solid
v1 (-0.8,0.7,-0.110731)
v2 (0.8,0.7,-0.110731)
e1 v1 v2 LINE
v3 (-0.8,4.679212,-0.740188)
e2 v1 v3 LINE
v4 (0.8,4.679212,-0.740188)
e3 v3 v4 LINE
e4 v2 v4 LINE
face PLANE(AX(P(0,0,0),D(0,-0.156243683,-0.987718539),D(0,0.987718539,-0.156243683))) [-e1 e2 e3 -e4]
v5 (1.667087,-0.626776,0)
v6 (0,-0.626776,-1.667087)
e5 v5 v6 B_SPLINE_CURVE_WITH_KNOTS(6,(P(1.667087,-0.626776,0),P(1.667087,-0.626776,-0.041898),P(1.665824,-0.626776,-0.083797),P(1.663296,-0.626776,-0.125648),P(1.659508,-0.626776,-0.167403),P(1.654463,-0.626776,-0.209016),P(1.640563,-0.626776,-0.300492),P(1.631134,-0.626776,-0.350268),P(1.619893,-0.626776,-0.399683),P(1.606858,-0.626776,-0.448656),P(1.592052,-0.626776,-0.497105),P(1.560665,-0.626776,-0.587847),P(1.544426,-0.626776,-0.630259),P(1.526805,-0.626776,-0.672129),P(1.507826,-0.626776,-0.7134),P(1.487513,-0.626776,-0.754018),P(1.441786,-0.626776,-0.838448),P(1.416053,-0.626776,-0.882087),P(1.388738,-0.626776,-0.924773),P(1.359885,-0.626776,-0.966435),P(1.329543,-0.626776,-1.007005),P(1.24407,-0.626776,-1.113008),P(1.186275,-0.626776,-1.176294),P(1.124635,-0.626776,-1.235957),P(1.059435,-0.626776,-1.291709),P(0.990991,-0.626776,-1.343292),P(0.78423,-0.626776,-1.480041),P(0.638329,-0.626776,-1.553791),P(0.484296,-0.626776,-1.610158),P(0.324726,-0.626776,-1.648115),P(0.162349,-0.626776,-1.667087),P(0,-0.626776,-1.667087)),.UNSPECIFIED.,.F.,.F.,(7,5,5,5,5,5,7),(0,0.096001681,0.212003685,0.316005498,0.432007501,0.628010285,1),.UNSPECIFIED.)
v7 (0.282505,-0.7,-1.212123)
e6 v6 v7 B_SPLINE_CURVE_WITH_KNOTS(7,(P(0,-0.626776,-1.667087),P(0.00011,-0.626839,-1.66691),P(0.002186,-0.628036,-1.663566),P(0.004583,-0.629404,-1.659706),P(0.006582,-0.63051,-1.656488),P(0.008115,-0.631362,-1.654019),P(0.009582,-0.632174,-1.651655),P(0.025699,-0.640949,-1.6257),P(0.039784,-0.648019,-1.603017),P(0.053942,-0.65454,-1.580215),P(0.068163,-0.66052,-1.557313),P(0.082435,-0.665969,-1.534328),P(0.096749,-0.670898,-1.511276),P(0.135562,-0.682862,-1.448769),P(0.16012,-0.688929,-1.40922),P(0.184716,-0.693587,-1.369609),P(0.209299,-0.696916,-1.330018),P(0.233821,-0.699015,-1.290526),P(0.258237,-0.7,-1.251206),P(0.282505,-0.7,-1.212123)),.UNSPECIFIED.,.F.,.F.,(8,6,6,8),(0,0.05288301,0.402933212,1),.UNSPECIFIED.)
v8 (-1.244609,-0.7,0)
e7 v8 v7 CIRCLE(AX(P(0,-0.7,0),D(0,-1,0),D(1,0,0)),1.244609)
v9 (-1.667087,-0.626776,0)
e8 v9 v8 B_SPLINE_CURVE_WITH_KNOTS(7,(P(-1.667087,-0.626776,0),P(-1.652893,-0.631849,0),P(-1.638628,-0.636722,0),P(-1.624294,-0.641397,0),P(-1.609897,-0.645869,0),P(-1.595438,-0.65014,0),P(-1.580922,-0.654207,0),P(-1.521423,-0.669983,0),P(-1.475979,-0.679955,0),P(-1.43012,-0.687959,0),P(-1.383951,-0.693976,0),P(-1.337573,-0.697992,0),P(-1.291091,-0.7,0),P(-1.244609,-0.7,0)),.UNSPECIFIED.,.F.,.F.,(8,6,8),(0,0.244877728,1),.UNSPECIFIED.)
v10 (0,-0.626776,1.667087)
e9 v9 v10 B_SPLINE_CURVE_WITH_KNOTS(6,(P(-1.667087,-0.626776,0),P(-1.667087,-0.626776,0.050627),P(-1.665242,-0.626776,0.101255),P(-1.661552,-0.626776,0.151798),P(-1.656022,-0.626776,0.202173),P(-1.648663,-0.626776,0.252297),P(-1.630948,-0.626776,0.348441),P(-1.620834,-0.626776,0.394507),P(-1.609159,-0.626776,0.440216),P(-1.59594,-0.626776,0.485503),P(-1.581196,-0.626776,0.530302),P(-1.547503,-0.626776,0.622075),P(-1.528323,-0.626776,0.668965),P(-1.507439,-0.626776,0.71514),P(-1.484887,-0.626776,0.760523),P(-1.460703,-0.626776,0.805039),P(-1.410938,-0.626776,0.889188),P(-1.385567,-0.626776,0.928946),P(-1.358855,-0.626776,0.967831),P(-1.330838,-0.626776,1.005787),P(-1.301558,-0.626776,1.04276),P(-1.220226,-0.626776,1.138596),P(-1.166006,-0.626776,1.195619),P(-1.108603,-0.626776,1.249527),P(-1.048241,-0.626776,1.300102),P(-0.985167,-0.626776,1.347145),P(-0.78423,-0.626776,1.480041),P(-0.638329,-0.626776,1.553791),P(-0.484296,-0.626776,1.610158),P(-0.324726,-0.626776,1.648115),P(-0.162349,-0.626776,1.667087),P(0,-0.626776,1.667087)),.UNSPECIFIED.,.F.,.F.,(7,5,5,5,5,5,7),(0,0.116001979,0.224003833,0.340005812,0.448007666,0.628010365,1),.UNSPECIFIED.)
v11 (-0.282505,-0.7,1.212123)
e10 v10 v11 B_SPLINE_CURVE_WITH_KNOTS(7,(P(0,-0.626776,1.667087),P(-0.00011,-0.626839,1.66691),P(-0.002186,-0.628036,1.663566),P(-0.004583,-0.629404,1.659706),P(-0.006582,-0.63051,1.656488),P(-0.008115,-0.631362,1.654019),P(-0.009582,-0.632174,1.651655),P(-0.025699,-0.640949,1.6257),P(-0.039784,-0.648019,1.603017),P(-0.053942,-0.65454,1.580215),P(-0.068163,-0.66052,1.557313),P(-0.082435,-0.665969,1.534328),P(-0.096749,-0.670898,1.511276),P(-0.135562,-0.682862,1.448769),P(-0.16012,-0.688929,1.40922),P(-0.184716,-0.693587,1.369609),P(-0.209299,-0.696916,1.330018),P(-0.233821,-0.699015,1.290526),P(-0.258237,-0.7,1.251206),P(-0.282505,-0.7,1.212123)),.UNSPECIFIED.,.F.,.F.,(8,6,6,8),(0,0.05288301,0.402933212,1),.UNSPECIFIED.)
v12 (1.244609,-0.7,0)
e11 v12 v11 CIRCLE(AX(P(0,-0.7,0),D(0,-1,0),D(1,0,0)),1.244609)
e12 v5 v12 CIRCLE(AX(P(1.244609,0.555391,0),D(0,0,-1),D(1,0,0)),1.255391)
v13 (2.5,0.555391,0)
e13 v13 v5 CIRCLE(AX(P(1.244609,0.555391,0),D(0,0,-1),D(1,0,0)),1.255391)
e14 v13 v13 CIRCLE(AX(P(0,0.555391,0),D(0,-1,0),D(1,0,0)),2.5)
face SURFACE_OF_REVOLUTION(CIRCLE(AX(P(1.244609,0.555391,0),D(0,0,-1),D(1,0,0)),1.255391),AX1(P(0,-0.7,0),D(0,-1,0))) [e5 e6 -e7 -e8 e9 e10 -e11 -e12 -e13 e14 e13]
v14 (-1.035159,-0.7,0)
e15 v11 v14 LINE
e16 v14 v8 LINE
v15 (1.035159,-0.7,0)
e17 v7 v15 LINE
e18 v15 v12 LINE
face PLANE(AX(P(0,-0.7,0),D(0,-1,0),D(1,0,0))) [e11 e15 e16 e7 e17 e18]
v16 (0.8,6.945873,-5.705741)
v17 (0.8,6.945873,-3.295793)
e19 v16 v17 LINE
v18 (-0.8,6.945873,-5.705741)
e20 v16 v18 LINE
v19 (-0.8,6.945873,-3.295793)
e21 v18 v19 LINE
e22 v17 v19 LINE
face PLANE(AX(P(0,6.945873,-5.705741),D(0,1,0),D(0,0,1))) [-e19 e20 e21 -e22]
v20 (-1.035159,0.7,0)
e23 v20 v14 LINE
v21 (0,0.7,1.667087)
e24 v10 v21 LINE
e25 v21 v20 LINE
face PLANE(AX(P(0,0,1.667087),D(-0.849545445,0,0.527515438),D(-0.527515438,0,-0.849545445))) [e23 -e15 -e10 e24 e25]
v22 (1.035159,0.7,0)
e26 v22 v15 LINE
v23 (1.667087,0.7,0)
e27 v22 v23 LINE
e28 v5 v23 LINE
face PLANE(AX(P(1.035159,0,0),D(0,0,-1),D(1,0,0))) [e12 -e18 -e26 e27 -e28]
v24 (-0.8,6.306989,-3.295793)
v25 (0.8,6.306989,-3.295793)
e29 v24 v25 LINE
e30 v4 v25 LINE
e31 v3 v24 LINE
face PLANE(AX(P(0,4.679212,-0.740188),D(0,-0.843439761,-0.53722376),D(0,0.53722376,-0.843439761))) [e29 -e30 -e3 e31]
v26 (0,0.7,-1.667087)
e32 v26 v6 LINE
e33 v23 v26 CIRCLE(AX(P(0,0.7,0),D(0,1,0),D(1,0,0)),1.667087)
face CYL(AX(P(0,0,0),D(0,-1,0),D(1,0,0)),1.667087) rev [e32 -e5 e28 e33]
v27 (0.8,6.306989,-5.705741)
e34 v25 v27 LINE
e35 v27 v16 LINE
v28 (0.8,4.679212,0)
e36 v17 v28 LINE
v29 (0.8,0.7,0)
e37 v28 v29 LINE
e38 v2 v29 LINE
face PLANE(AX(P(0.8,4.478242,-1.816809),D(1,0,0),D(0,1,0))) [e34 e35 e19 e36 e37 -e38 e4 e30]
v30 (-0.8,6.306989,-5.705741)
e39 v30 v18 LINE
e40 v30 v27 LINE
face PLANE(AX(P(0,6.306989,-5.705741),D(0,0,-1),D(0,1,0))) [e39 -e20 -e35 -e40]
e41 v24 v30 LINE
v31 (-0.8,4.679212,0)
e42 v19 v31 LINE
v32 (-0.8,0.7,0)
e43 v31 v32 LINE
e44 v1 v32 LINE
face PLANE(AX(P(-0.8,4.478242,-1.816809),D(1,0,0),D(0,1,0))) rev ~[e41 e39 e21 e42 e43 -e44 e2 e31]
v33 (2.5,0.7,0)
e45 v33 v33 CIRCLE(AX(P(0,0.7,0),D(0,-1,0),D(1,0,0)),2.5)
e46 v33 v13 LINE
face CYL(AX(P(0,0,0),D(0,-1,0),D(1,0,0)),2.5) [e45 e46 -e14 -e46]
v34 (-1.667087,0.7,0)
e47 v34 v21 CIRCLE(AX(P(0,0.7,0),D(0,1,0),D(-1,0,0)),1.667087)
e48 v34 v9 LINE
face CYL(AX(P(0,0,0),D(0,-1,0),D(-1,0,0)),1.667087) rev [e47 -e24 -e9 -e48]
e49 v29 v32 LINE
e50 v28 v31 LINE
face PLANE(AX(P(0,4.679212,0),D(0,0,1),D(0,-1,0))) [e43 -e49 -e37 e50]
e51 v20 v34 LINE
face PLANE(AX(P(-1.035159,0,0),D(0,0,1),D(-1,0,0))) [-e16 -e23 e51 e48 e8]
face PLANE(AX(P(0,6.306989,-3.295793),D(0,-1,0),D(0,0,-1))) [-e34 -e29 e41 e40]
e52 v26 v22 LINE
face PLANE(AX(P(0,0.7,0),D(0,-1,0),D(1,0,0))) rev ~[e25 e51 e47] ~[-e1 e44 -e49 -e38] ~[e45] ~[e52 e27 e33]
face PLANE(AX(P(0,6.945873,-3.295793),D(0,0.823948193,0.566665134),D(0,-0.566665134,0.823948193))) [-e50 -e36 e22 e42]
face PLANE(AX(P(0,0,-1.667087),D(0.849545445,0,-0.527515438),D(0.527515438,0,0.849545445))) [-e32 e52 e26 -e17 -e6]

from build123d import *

# Parameters (mm, degrees)
F0_R     = 2.5
F2_DEPTH = 0.7
F3_DEPTH = 0.8


# Not quite as in the source:
# - a fillet or chamfer that OpenCascade refuses, or shapes differently, is made with other operations: its cross-section is extruded or revolved along the edge and cut away or added


with BuildPart() as f2:
    # F0 (on Front) → F2 (new body, symmetric)
    with BuildSketch(Plane.XZ):
        Circle(F0_R)
        with BuildLine():
            ThreePointArc((0, 1.6670872347), (1.1788086885, 1.1788086885), (1.6670872347, 0))
            ThreePointArc((1.6670872347, 0), (1.1788086885, -1.1788086885), (0, -1.6670872347))
            ThreePointArc((0, -1.6670872347), (-1.1788086885, -1.1788086885), (-1.6670872347, 0))
            ThreePointArc((-1.6670872347, 0), (-1.1788086885, 1.1788086885), (0, 1.6670872347))
        make_face(mode=Mode.SUBTRACT)
        Polygon((1.035158575, 0), (0, 1.6670872347), (-1.035158575, 0), (0, -1.6670872347), align=None)
        with BuildLine():
            Line((1.035158575, 0), (1.6670872347, 0))
            ThreePointArc((1.6670872347, 0), (1.1788086885, 1.1788086885), (0, 1.6670872347))
            Line((0, 1.6670872347), (1.035158575, 0))
        make_face()
        with BuildLine():
            ThreePointArc((-1.6670872347, 0), (-1.1788086885, -1.1788086885), (0, -1.6670872347))
            Line((0, -1.6670872347), (-1.035158575, 0))
            Line((-1.035158575, 0), (-1.6670872347, 0))
        make_face()
    extrude(amount=F2_DEPTH, both=True)

    # F1 (on Right) → F3 (join, symmetric)
    with BuildSketch(Plane.YZ):
        Polygon((4.6792123099, 0), (0, 0), (4.6792123099, -0.7401879564), (6.3069890554, -3.2957927736), (6.3069890554, -4.3182368269), (6.3069890554, -5.7057410895), (6.9458728476, -5.7057410895), (6.9458728476, -4.3182368269), (6.9458728476, -3.2957927736), align=None)
    extrude(amount=F3_DEPTH, both=True)

    # F4: fillet of radius 1.2553910524 on 1 edges, made by hand

    # F4_s1 → F4_t2 (revolve, cut)
    with BuildSketch(Plane.XY):
        with BuildLine():
            ThreePointArc((2.5, 0.5553910524), (2.1323044738, -0.3323044738), (1.2446089476, -0.7))
            Line((1.2446089476, -0.7), (2.5, -0.7))
            Line((2.5, -0.7), (2.5, 0.5553910524))
        make_face()
    revolve(axis=Axis((0, -0.7, 0), (0, -1, 0)), mode=Mode.SUBTRACT)


solid = f2.part
